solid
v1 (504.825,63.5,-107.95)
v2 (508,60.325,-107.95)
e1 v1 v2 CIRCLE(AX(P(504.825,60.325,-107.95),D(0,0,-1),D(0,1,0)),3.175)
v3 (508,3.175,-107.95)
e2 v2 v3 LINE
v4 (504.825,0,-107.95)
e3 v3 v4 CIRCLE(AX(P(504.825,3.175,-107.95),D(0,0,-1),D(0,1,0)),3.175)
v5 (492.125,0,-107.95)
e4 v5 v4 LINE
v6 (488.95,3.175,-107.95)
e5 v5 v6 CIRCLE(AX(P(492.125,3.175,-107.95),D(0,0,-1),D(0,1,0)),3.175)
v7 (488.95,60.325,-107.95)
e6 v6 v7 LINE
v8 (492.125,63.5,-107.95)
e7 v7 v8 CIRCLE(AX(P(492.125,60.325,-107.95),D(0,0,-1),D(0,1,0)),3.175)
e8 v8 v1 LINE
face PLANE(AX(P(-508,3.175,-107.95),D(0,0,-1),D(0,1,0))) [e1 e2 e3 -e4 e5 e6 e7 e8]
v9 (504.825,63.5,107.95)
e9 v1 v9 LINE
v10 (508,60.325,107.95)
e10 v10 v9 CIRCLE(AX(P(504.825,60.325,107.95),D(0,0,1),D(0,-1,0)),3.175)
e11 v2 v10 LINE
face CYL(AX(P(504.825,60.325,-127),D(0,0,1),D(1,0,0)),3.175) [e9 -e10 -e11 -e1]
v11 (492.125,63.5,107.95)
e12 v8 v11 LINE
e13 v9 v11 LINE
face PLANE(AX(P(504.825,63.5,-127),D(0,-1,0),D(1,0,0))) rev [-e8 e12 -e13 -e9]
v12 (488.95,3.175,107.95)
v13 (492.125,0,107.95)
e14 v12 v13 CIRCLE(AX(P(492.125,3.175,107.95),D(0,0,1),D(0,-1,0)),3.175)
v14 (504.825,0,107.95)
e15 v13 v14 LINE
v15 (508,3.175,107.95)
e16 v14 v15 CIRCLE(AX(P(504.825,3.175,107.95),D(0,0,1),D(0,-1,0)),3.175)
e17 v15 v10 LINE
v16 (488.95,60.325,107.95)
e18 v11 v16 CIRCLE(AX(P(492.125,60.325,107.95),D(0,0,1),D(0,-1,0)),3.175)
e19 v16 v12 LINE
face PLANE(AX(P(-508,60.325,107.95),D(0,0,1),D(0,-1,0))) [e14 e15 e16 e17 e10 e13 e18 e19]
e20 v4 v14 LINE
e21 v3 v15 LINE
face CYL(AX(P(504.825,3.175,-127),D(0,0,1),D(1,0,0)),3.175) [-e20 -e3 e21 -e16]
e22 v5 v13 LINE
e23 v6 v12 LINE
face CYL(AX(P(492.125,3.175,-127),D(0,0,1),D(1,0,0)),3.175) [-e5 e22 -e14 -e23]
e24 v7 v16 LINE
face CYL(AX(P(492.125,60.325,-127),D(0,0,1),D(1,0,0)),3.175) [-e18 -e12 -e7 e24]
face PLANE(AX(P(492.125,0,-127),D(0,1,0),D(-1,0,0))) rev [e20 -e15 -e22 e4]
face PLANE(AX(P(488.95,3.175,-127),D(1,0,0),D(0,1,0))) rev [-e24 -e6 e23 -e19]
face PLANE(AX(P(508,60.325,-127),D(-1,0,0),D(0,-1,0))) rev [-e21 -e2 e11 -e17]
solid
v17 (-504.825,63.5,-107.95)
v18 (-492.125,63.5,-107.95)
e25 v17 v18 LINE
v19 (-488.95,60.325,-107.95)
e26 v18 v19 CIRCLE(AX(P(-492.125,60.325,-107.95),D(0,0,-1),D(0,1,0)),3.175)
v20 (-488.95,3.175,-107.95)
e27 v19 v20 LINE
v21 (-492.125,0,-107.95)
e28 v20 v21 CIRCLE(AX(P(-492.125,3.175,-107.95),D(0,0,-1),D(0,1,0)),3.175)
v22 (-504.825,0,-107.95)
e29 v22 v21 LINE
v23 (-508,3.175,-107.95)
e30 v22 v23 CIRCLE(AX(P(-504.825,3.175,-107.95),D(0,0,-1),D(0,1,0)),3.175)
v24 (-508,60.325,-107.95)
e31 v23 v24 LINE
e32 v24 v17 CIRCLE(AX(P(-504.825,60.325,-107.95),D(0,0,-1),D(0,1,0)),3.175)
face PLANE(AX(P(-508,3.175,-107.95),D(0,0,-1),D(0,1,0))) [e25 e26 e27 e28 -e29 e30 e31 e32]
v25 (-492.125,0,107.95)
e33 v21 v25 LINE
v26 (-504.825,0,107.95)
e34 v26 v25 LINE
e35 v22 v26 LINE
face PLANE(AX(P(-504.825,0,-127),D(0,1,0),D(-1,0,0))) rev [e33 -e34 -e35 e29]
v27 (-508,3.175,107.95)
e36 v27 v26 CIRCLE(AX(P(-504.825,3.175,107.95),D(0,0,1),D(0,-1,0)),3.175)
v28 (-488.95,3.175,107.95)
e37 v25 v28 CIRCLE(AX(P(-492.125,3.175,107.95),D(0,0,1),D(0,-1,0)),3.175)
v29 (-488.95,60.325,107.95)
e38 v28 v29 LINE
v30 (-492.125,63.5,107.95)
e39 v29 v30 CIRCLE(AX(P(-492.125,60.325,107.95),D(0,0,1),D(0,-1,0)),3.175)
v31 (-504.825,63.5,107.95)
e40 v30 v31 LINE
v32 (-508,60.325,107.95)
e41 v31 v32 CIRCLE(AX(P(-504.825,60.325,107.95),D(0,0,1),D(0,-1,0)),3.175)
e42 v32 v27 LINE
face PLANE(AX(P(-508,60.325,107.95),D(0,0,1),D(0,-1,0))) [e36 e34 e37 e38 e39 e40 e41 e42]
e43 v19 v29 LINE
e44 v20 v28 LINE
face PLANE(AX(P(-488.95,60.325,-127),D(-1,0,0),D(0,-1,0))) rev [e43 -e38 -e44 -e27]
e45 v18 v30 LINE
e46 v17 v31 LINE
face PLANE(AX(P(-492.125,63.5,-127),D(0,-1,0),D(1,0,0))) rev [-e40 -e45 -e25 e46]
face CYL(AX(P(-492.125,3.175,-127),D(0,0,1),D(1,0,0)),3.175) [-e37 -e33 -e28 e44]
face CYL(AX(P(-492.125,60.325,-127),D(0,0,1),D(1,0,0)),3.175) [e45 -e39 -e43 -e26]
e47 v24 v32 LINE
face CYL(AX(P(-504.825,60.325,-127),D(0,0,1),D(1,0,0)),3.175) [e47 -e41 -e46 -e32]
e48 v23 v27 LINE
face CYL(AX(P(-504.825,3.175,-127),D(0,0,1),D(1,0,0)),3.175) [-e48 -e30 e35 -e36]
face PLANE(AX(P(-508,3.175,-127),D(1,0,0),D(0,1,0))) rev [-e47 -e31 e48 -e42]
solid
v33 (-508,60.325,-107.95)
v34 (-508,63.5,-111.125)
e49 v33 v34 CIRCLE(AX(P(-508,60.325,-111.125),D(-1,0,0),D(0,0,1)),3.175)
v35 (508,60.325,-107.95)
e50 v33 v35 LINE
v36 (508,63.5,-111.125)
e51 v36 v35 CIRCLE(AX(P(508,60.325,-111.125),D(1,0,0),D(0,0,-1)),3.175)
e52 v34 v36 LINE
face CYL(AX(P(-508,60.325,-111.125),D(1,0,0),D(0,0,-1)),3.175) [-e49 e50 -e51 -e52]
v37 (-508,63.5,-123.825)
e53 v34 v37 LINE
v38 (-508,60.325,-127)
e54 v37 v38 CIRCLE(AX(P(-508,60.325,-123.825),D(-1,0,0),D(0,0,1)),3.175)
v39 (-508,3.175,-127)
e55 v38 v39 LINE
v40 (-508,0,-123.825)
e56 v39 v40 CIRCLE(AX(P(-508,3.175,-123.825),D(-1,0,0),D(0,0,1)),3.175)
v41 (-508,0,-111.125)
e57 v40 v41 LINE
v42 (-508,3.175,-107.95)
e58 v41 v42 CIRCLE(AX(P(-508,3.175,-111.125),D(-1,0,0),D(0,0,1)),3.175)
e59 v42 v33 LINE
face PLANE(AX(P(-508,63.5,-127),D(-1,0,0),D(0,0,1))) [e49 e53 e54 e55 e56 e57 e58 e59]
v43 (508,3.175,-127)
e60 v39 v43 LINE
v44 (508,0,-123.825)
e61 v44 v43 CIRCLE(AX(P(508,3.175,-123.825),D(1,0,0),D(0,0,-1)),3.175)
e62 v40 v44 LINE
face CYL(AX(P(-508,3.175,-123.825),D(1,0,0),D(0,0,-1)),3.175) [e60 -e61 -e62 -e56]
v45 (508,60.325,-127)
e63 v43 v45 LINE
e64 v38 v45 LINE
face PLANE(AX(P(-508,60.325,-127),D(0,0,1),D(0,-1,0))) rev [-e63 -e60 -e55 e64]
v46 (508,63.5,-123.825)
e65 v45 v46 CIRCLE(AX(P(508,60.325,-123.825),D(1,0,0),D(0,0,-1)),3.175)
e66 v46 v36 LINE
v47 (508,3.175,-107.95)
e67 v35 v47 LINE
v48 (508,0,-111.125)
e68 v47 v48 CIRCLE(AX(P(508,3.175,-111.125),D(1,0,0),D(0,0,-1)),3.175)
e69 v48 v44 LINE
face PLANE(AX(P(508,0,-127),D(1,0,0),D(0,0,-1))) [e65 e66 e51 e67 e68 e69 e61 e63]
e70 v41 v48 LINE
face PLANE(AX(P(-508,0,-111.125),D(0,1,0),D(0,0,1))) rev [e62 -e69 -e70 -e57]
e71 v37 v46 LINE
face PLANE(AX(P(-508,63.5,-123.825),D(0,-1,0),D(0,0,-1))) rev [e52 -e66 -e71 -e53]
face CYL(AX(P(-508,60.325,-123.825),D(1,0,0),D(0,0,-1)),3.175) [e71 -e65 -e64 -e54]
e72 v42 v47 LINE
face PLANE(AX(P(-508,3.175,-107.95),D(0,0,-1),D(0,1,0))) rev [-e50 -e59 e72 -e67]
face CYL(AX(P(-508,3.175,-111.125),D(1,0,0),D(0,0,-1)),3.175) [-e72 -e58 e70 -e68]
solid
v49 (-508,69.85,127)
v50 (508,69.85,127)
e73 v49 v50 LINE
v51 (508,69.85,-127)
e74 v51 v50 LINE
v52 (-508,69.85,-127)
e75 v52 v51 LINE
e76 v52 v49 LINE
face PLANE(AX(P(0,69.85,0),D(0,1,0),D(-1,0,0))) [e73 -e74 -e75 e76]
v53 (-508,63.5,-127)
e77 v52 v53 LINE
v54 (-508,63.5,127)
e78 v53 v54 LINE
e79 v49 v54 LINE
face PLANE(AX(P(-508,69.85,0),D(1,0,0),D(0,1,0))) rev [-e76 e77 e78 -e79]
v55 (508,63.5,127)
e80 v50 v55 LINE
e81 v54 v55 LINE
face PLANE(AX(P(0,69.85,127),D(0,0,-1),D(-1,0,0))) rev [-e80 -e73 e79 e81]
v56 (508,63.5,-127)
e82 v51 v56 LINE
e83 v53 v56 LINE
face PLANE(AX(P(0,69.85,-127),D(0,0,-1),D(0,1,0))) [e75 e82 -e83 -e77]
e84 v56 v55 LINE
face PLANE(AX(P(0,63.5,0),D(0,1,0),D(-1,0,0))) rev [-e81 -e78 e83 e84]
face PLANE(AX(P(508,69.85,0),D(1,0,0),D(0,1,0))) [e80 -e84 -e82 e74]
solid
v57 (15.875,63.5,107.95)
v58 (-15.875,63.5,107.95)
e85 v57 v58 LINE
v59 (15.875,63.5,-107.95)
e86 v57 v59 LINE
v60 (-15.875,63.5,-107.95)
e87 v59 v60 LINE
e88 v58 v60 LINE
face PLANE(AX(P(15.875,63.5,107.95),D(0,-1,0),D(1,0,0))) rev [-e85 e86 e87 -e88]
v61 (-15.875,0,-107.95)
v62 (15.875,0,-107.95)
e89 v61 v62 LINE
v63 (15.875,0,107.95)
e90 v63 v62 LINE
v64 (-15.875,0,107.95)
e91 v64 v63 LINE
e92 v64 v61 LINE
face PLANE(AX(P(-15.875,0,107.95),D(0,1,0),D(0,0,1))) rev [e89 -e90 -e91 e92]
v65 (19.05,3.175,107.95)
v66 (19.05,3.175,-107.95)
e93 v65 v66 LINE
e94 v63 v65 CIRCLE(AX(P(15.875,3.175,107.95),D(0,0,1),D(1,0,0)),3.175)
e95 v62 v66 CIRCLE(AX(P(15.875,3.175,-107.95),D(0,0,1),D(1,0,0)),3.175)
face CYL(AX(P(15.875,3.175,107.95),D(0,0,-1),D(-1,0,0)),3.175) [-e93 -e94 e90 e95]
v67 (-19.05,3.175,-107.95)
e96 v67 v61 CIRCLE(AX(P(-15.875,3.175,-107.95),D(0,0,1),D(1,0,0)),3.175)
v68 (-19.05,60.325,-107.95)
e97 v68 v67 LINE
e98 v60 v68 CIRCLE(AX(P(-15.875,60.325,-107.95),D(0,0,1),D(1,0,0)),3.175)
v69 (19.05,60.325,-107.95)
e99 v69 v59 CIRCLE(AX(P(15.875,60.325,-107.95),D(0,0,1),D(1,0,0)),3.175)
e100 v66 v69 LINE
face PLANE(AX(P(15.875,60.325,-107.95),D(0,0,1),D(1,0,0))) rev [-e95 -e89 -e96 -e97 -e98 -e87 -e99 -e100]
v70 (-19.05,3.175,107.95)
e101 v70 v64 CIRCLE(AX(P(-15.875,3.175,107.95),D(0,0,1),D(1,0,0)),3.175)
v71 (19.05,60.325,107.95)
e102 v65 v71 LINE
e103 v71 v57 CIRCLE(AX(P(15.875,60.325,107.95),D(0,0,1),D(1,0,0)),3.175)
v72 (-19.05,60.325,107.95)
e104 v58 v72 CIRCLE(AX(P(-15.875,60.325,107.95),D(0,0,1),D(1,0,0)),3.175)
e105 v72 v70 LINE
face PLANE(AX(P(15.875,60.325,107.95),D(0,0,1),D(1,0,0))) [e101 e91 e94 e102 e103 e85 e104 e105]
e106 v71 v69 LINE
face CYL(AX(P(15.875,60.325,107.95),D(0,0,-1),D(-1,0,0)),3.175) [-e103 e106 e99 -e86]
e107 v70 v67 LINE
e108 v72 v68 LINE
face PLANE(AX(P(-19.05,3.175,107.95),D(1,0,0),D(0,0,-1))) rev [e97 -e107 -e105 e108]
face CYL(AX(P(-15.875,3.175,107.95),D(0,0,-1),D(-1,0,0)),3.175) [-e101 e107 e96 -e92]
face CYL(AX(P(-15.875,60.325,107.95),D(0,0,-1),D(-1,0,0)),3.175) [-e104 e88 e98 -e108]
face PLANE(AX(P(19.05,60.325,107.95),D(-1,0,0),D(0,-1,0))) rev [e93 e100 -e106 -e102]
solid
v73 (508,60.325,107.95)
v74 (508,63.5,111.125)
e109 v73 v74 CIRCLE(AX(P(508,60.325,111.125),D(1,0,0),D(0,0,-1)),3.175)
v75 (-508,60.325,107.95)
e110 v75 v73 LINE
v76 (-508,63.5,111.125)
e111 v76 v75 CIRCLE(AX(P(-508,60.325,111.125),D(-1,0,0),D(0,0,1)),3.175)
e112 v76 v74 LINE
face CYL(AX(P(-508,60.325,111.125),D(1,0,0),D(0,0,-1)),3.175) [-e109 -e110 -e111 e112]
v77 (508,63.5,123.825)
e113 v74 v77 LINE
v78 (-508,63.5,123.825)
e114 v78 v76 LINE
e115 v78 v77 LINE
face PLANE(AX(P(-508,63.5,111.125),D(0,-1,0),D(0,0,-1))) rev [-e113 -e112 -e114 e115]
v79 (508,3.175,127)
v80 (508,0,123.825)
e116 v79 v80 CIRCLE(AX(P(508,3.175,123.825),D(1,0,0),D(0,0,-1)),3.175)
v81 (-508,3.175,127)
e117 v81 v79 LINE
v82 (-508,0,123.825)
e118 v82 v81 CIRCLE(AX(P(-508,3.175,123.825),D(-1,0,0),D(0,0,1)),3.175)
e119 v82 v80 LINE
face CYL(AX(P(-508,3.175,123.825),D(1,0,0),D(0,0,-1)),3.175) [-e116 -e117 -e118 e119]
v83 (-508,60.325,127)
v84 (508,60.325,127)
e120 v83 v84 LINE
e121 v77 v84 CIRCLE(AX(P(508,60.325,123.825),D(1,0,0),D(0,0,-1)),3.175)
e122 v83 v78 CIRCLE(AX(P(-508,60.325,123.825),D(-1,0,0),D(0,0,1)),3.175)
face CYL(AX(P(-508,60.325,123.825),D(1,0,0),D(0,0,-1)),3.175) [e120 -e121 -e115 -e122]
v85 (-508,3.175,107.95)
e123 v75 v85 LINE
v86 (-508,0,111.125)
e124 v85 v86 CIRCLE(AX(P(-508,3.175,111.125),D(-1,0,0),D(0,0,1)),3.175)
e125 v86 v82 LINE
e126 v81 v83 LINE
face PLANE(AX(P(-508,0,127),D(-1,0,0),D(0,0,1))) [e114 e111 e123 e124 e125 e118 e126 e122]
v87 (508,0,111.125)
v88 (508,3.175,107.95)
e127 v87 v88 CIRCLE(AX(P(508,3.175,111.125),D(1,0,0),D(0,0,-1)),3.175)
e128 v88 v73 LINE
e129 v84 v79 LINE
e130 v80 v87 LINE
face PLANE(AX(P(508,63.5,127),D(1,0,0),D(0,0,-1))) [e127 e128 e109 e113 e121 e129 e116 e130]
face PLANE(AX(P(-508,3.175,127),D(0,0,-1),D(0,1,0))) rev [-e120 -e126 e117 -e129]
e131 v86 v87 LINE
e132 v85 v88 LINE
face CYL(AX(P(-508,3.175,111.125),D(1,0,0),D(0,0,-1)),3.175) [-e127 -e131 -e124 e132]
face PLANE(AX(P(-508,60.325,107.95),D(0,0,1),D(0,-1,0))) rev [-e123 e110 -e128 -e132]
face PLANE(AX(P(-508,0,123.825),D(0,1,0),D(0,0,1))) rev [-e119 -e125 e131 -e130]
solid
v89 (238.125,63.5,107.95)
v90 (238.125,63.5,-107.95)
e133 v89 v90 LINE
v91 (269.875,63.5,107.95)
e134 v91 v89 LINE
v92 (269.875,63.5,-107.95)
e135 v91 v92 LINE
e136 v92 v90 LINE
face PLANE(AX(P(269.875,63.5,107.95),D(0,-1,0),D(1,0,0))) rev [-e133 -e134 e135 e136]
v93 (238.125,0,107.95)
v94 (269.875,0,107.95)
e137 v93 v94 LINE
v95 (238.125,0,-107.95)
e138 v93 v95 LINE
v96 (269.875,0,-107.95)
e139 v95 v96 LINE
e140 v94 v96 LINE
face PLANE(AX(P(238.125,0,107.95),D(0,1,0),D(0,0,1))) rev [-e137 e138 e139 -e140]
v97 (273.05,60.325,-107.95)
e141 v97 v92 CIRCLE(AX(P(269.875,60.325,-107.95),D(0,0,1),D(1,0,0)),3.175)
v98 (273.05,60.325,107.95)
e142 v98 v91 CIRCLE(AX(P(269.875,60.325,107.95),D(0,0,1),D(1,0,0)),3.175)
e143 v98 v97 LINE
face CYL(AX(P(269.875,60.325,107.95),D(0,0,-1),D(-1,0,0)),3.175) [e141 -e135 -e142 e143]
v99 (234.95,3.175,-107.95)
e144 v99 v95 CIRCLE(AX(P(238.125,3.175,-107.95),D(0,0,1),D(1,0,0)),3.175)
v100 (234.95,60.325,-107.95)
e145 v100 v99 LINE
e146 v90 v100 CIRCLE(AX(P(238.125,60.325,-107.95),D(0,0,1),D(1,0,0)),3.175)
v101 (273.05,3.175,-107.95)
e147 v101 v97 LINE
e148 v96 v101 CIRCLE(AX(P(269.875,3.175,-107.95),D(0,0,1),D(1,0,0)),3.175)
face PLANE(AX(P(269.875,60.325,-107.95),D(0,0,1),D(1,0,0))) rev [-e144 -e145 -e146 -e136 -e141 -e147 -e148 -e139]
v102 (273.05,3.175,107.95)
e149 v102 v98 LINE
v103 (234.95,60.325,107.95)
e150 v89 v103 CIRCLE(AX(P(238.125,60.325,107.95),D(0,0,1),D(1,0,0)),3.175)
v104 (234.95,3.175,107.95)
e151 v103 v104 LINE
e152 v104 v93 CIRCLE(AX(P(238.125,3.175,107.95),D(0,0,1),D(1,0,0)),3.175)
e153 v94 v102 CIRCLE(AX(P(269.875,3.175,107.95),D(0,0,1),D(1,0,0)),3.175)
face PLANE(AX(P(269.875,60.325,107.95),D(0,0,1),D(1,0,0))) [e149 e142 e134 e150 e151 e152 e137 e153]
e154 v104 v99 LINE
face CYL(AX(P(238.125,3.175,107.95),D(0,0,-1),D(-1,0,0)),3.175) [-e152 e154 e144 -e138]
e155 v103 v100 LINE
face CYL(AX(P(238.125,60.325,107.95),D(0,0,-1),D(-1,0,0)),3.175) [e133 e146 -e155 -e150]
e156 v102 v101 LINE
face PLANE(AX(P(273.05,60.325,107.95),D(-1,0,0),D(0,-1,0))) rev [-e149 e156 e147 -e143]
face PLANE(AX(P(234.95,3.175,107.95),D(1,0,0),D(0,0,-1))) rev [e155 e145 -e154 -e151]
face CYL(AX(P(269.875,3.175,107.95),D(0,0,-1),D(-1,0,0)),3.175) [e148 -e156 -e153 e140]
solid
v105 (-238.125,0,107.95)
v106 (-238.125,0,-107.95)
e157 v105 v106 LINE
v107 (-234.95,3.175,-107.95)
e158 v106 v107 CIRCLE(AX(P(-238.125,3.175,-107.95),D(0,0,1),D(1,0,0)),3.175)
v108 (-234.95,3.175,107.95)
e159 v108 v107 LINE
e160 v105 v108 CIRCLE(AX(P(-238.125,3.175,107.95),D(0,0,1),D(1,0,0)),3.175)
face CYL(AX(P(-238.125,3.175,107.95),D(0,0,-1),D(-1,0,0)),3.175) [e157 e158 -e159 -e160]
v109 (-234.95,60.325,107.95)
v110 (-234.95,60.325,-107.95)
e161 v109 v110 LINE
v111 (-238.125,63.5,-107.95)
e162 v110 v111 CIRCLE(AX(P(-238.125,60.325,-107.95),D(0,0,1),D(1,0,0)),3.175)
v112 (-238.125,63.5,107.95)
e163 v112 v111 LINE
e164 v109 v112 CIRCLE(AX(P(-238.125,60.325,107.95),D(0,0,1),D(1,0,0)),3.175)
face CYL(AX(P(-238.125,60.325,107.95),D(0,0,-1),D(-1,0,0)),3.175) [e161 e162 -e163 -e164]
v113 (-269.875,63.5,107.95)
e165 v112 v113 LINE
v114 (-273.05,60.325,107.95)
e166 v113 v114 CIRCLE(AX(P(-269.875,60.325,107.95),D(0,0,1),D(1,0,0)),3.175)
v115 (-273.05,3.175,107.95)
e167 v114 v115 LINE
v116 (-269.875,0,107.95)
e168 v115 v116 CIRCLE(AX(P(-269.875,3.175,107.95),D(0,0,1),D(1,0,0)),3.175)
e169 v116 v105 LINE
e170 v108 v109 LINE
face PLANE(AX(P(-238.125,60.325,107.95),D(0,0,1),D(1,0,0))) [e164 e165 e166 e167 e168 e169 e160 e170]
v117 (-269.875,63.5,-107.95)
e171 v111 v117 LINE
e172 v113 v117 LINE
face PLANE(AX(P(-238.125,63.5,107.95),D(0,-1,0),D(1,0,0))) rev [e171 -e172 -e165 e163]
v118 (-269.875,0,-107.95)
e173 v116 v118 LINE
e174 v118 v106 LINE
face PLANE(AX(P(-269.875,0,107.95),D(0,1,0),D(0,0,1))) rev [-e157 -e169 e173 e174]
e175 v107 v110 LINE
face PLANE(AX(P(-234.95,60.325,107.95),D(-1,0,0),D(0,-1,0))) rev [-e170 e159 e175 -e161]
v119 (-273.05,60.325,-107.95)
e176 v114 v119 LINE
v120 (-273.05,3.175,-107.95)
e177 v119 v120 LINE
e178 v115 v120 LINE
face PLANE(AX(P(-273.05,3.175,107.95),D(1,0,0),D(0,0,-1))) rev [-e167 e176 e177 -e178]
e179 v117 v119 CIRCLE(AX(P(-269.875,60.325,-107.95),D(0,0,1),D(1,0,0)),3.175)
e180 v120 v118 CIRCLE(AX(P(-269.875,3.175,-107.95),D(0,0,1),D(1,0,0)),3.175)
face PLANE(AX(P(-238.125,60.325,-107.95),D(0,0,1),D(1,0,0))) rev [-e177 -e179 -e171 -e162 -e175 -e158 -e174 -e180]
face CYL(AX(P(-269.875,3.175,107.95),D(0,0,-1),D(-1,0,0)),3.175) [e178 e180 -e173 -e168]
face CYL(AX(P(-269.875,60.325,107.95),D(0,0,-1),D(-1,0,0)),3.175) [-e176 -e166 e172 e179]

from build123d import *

# Parameters (mm, degrees)
PROFILE_START           = -508
PROFILE_1_X_3_1_DEPTH   = 1016
PROFILE_START_2         = -107.95
PROFILE_1_X_3_1_2_DEPTH = 215.9
PROFILE_2_X_4_9_DEPTH   = 215.9
PROFILE_2_X_4_9_2_DEPTH = 215.9
PROFILE_2_X_4_9_3_DEPTH = 215.9
SKETCH117_W             = 254
SKETCH117_H             = 254
SKETCH117_W_2           = 254.10095092
SKETCH117_W_3           = 253.89904908
SKETCH117_W_4           = 12.7
SKETCH117_H_2           = 215.9
BOSS_EXTRUDE2_DEPTH     = 6.35


# Read off the part's stored shape, not the designer's step: Profile 1 X 3(1)
with BuildPart() as part:
    # Profile 1 X 3(1) outline → Profile 1 X 3(1) (new body)
    with BuildSketch(Plane.YZ.offset(PROFILE_START)):
        with BuildLine():
            Line((3.175, -127), (60.325, -127))
            ThreePointArc((60.325, -127), (62.57006403, -126.07006403), (63.5, -123.825))
            Line((63.5, -123.825), (63.5, -111.125))
            ThreePointArc((63.5, -111.125), (62.57006403, -108.87993597), (60.325, -107.95))
            Line((60.325, -107.95), (3.175, -107.95))
            ThreePointArc((3.175, -107.95), (0.92993597, -108.87993597), (0, -111.125))
            Line((0, -111.125), (0, -123.825))
            ThreePointArc((0, -123.825), (0.92993597, -126.07006403), (3.175, -127))
        make_face()
        with BuildLine():
            Line((3.175, 107.95), (60.325, 107.95))
            ThreePointArc((60.325, 107.95), (62.57006403, 108.87993597), (63.5, 111.125))
            Line((63.5, 111.125), (63.5, 123.825))
            ThreePointArc((63.5, 123.825), (62.57006403, 126.07006403), (60.325, 127))
            Line((60.325, 127), (3.175, 127))
            ThreePointArc((3.175, 127), (0.92993597, 126.07006403), (0, 123.825))
            Line((0, 123.825), (0, 111.125))
            ThreePointArc((0, 111.125), (0.92993597, 108.87993597), (3.175, 107.95))
        make_face()
    extrude(amount=PROFILE_1_X_3_1_DEPTH)


with BuildPart() as body_2:
    # Profile 1 X 3_1 2 outline → Profile 1 X 3_1 2 (new body)
    with BuildSketch(Plane.XY.offset(PROFILE_START_2)):
        with BuildLine():
            Line((504.825, 63.5), (492.125, 63.5))
            ThreePointArc((492.125, 63.5), (489.87993597, 62.57006403), (488.95, 60.325))
            Line((488.95, 60.325), (488.95, 3.175))
            ThreePointArc((488.95, 3.175), (489.87993597, 0.92993597), (492.125, 0))
            Line((492.125, 0), (504.825, 0))
            ThreePointArc((504.825, 0), (507.07006403, 0.92993597), (508, 3.175))
            Line((508, 3.175), (508, 60.325))
            ThreePointArc((508, 60.325), (507.07006403, 62.57006403), (504.825, 63.5))
        make_face()
        with BuildLine():
            Line((-492.125, 63.5), (-504.825, 63.5))
            ThreePointArc((-504.825, 63.5), (-507.07006403, 62.57006403), (-508, 60.325))
            Line((-508, 60.325), (-508, 3.175))
            ThreePointArc((-508, 3.175), (-507.07006403, 0.92993597), (-504.825, 0))
            Line((-504.825, 0), (-492.125, 0))
            ThreePointArc((-492.125, 0), (-489.87993597, 0.92993597), (-488.95, 3.175))
            Line((-488.95, 3.175), (-488.95, 60.325))
            ThreePointArc((-488.95, 60.325), (-489.87993597, 62.57006403), (-492.125, 63.5))
        make_face()
    extrude(amount=PROFILE_1_X_3_1_2_DEPTH)


with BuildPart() as body_3:
    # Sketch116 → Profile 2 X 4(9) (new body)
    with BuildSketch(Plane(origin=(-273.05, 0, -107.95), x_dir=(1, 0, 0), z_dir=(0, 0, 1))):
        with BuildLine():
            Line((3.175, 0), (34.925, 0))
            ThreePointArc((34.925, 0), (37.17006403, 0.92993597), (38.1, 3.175))
            Line((38.1, 3.175), (38.1, 60.325))
            ThreePointArc((38.1, 60.325), (37.17006403, 62.57006403), (34.925, 63.5))
            Line((34.925, 63.5), (3.175, 63.5))
            ThreePointArc((3.175, 63.5), (0.92993597, 62.57006403), (0, 60.325))
            Line((0, 60.325), (0, 3.175))
            ThreePointArc((0, 3.175), (0.92993597, 0.92993597), (3.175, 0))
        make_face()
    extrude(amount=PROFILE_2_X_4_9_DEPTH)


with BuildPart() as body_4:
    # Sketch116 on segment 2 (carried to segment 2) → Profile 2 X 4_9 2 (new body)
    with BuildSketch(Plane(origin=(-19.05, 0, -107.95), x_dir=(1, 0, 0), z_dir=(0, 0, 1))):
        with BuildLine():
            Line((3.175, 0), (34.925, 0))
            ThreePointArc((34.925, 0), (37.17006403, 0.92993597), (38.1, 3.175))
            Line((38.1, 3.175), (38.1, 60.325))
            ThreePointArc((38.1, 60.325), (37.17006403, 62.57006403), (34.925, 63.5))
            Line((34.925, 63.5), (3.175, 63.5))
            ThreePointArc((3.175, 63.5), (0.92993597, 62.57006403), (0, 60.325))
            Line((0, 60.325), (0, 3.175))
            ThreePointArc((0, 3.175), (0.92993597, 0.92993597), (3.175, 0))
        make_face()
    extrude(amount=PROFILE_2_X_4_9_2_DEPTH)


with BuildPart() as body_5:
    # Sketch116 on segment 3 (carried to segment 3) → Profile 2 X 4_9 3 (new body)
    with BuildSketch(Plane(origin=(234.95, 0, -107.95), x_dir=(1, 0, 0), z_dir=(0, 0, 1))):
        with BuildLine():
            Line((3.175, 0), (34.925, 0))
            ThreePointArc((34.925, 0), (37.17006403, 0.92993597), (38.1, 3.175))
            Line((38.1, 3.175), (38.1, 60.325))
            ThreePointArc((38.1, 60.325), (37.17006403, 62.57006403), (34.925, 63.5))
            Line((34.925, 63.5), (3.175, 63.5))
            ThreePointArc((3.175, 63.5), (0.92993597, 62.57006403), (0, 60.325))
            Line((0, 60.325), (0, 3.175))
            ThreePointArc((0, 3.175), (0.92993597, 0.92993597), (3.175, 0))
        make_face()
    extrude(amount=PROFILE_2_X_4_9_3_DEPTH)


with BuildPart() as body_6:
    # Sketch117 → Boss-Extrude2 (new body)
    # profile 1 of 5: a face of its own
    with BuildSketch(Plane(origin=(0, 63.5, 0), x_dir=(1, 0, 0), z_dir=(0, 1, 0))):
        with Locations((-127.10095092, 0)):
            Rectangle(SKETCH117_W, SKETCH117_H)
    # profile 2 of 5: a face of its own
    with BuildSketch(Plane(origin=(0, 63.5, 0), x_dir=(1, 0, 0), z_dir=(0, 1, 0))):
        with Locations((126.89904908, 0)):
            Rectangle(SKETCH117_W, SKETCH117_H)
    # profile 3 of 5: a face of its own
    with BuildSketch(Plane(origin=(0, 63.5, 0), x_dir=(1, 0, 0), z_dir=(0, 1, 0))):
        with Locations((380.94952454, 0)):
            Rectangle(SKETCH117_W_2, SKETCH117_H)
    # profile 4 of 5: a face of its own
    with BuildSketch(Plane(origin=(0, 63.5, 0), x_dir=(1, 0, 0), z_dir=(0, 1, 0))):
        with Locations((-381.05047546, 0)):
            Rectangle(SKETCH117_W_3, SKETCH117_H)
        with Locations((-498.475, 0)):
            Rectangle(SKETCH117_W_4, SKETCH117_H_2, mode=Mode.SUBTRACT)
    # profile 5 of 5: a face of its own
    with BuildSketch(Plane(origin=(0, 63.5, 0), x_dir=(1, 0, 0), z_dir=(0, 1, 0))):
        with Locations((-498.475, 0)):
            Rectangle(SKETCH117_W_4, SKETCH117_H_2)
    extrude(amount=BOSS_EXTRUDE2_DEPTH)


solid = Compound([part.part, body_2.part, body_3.part, body_4.part, body_5.part, body_6.part])
